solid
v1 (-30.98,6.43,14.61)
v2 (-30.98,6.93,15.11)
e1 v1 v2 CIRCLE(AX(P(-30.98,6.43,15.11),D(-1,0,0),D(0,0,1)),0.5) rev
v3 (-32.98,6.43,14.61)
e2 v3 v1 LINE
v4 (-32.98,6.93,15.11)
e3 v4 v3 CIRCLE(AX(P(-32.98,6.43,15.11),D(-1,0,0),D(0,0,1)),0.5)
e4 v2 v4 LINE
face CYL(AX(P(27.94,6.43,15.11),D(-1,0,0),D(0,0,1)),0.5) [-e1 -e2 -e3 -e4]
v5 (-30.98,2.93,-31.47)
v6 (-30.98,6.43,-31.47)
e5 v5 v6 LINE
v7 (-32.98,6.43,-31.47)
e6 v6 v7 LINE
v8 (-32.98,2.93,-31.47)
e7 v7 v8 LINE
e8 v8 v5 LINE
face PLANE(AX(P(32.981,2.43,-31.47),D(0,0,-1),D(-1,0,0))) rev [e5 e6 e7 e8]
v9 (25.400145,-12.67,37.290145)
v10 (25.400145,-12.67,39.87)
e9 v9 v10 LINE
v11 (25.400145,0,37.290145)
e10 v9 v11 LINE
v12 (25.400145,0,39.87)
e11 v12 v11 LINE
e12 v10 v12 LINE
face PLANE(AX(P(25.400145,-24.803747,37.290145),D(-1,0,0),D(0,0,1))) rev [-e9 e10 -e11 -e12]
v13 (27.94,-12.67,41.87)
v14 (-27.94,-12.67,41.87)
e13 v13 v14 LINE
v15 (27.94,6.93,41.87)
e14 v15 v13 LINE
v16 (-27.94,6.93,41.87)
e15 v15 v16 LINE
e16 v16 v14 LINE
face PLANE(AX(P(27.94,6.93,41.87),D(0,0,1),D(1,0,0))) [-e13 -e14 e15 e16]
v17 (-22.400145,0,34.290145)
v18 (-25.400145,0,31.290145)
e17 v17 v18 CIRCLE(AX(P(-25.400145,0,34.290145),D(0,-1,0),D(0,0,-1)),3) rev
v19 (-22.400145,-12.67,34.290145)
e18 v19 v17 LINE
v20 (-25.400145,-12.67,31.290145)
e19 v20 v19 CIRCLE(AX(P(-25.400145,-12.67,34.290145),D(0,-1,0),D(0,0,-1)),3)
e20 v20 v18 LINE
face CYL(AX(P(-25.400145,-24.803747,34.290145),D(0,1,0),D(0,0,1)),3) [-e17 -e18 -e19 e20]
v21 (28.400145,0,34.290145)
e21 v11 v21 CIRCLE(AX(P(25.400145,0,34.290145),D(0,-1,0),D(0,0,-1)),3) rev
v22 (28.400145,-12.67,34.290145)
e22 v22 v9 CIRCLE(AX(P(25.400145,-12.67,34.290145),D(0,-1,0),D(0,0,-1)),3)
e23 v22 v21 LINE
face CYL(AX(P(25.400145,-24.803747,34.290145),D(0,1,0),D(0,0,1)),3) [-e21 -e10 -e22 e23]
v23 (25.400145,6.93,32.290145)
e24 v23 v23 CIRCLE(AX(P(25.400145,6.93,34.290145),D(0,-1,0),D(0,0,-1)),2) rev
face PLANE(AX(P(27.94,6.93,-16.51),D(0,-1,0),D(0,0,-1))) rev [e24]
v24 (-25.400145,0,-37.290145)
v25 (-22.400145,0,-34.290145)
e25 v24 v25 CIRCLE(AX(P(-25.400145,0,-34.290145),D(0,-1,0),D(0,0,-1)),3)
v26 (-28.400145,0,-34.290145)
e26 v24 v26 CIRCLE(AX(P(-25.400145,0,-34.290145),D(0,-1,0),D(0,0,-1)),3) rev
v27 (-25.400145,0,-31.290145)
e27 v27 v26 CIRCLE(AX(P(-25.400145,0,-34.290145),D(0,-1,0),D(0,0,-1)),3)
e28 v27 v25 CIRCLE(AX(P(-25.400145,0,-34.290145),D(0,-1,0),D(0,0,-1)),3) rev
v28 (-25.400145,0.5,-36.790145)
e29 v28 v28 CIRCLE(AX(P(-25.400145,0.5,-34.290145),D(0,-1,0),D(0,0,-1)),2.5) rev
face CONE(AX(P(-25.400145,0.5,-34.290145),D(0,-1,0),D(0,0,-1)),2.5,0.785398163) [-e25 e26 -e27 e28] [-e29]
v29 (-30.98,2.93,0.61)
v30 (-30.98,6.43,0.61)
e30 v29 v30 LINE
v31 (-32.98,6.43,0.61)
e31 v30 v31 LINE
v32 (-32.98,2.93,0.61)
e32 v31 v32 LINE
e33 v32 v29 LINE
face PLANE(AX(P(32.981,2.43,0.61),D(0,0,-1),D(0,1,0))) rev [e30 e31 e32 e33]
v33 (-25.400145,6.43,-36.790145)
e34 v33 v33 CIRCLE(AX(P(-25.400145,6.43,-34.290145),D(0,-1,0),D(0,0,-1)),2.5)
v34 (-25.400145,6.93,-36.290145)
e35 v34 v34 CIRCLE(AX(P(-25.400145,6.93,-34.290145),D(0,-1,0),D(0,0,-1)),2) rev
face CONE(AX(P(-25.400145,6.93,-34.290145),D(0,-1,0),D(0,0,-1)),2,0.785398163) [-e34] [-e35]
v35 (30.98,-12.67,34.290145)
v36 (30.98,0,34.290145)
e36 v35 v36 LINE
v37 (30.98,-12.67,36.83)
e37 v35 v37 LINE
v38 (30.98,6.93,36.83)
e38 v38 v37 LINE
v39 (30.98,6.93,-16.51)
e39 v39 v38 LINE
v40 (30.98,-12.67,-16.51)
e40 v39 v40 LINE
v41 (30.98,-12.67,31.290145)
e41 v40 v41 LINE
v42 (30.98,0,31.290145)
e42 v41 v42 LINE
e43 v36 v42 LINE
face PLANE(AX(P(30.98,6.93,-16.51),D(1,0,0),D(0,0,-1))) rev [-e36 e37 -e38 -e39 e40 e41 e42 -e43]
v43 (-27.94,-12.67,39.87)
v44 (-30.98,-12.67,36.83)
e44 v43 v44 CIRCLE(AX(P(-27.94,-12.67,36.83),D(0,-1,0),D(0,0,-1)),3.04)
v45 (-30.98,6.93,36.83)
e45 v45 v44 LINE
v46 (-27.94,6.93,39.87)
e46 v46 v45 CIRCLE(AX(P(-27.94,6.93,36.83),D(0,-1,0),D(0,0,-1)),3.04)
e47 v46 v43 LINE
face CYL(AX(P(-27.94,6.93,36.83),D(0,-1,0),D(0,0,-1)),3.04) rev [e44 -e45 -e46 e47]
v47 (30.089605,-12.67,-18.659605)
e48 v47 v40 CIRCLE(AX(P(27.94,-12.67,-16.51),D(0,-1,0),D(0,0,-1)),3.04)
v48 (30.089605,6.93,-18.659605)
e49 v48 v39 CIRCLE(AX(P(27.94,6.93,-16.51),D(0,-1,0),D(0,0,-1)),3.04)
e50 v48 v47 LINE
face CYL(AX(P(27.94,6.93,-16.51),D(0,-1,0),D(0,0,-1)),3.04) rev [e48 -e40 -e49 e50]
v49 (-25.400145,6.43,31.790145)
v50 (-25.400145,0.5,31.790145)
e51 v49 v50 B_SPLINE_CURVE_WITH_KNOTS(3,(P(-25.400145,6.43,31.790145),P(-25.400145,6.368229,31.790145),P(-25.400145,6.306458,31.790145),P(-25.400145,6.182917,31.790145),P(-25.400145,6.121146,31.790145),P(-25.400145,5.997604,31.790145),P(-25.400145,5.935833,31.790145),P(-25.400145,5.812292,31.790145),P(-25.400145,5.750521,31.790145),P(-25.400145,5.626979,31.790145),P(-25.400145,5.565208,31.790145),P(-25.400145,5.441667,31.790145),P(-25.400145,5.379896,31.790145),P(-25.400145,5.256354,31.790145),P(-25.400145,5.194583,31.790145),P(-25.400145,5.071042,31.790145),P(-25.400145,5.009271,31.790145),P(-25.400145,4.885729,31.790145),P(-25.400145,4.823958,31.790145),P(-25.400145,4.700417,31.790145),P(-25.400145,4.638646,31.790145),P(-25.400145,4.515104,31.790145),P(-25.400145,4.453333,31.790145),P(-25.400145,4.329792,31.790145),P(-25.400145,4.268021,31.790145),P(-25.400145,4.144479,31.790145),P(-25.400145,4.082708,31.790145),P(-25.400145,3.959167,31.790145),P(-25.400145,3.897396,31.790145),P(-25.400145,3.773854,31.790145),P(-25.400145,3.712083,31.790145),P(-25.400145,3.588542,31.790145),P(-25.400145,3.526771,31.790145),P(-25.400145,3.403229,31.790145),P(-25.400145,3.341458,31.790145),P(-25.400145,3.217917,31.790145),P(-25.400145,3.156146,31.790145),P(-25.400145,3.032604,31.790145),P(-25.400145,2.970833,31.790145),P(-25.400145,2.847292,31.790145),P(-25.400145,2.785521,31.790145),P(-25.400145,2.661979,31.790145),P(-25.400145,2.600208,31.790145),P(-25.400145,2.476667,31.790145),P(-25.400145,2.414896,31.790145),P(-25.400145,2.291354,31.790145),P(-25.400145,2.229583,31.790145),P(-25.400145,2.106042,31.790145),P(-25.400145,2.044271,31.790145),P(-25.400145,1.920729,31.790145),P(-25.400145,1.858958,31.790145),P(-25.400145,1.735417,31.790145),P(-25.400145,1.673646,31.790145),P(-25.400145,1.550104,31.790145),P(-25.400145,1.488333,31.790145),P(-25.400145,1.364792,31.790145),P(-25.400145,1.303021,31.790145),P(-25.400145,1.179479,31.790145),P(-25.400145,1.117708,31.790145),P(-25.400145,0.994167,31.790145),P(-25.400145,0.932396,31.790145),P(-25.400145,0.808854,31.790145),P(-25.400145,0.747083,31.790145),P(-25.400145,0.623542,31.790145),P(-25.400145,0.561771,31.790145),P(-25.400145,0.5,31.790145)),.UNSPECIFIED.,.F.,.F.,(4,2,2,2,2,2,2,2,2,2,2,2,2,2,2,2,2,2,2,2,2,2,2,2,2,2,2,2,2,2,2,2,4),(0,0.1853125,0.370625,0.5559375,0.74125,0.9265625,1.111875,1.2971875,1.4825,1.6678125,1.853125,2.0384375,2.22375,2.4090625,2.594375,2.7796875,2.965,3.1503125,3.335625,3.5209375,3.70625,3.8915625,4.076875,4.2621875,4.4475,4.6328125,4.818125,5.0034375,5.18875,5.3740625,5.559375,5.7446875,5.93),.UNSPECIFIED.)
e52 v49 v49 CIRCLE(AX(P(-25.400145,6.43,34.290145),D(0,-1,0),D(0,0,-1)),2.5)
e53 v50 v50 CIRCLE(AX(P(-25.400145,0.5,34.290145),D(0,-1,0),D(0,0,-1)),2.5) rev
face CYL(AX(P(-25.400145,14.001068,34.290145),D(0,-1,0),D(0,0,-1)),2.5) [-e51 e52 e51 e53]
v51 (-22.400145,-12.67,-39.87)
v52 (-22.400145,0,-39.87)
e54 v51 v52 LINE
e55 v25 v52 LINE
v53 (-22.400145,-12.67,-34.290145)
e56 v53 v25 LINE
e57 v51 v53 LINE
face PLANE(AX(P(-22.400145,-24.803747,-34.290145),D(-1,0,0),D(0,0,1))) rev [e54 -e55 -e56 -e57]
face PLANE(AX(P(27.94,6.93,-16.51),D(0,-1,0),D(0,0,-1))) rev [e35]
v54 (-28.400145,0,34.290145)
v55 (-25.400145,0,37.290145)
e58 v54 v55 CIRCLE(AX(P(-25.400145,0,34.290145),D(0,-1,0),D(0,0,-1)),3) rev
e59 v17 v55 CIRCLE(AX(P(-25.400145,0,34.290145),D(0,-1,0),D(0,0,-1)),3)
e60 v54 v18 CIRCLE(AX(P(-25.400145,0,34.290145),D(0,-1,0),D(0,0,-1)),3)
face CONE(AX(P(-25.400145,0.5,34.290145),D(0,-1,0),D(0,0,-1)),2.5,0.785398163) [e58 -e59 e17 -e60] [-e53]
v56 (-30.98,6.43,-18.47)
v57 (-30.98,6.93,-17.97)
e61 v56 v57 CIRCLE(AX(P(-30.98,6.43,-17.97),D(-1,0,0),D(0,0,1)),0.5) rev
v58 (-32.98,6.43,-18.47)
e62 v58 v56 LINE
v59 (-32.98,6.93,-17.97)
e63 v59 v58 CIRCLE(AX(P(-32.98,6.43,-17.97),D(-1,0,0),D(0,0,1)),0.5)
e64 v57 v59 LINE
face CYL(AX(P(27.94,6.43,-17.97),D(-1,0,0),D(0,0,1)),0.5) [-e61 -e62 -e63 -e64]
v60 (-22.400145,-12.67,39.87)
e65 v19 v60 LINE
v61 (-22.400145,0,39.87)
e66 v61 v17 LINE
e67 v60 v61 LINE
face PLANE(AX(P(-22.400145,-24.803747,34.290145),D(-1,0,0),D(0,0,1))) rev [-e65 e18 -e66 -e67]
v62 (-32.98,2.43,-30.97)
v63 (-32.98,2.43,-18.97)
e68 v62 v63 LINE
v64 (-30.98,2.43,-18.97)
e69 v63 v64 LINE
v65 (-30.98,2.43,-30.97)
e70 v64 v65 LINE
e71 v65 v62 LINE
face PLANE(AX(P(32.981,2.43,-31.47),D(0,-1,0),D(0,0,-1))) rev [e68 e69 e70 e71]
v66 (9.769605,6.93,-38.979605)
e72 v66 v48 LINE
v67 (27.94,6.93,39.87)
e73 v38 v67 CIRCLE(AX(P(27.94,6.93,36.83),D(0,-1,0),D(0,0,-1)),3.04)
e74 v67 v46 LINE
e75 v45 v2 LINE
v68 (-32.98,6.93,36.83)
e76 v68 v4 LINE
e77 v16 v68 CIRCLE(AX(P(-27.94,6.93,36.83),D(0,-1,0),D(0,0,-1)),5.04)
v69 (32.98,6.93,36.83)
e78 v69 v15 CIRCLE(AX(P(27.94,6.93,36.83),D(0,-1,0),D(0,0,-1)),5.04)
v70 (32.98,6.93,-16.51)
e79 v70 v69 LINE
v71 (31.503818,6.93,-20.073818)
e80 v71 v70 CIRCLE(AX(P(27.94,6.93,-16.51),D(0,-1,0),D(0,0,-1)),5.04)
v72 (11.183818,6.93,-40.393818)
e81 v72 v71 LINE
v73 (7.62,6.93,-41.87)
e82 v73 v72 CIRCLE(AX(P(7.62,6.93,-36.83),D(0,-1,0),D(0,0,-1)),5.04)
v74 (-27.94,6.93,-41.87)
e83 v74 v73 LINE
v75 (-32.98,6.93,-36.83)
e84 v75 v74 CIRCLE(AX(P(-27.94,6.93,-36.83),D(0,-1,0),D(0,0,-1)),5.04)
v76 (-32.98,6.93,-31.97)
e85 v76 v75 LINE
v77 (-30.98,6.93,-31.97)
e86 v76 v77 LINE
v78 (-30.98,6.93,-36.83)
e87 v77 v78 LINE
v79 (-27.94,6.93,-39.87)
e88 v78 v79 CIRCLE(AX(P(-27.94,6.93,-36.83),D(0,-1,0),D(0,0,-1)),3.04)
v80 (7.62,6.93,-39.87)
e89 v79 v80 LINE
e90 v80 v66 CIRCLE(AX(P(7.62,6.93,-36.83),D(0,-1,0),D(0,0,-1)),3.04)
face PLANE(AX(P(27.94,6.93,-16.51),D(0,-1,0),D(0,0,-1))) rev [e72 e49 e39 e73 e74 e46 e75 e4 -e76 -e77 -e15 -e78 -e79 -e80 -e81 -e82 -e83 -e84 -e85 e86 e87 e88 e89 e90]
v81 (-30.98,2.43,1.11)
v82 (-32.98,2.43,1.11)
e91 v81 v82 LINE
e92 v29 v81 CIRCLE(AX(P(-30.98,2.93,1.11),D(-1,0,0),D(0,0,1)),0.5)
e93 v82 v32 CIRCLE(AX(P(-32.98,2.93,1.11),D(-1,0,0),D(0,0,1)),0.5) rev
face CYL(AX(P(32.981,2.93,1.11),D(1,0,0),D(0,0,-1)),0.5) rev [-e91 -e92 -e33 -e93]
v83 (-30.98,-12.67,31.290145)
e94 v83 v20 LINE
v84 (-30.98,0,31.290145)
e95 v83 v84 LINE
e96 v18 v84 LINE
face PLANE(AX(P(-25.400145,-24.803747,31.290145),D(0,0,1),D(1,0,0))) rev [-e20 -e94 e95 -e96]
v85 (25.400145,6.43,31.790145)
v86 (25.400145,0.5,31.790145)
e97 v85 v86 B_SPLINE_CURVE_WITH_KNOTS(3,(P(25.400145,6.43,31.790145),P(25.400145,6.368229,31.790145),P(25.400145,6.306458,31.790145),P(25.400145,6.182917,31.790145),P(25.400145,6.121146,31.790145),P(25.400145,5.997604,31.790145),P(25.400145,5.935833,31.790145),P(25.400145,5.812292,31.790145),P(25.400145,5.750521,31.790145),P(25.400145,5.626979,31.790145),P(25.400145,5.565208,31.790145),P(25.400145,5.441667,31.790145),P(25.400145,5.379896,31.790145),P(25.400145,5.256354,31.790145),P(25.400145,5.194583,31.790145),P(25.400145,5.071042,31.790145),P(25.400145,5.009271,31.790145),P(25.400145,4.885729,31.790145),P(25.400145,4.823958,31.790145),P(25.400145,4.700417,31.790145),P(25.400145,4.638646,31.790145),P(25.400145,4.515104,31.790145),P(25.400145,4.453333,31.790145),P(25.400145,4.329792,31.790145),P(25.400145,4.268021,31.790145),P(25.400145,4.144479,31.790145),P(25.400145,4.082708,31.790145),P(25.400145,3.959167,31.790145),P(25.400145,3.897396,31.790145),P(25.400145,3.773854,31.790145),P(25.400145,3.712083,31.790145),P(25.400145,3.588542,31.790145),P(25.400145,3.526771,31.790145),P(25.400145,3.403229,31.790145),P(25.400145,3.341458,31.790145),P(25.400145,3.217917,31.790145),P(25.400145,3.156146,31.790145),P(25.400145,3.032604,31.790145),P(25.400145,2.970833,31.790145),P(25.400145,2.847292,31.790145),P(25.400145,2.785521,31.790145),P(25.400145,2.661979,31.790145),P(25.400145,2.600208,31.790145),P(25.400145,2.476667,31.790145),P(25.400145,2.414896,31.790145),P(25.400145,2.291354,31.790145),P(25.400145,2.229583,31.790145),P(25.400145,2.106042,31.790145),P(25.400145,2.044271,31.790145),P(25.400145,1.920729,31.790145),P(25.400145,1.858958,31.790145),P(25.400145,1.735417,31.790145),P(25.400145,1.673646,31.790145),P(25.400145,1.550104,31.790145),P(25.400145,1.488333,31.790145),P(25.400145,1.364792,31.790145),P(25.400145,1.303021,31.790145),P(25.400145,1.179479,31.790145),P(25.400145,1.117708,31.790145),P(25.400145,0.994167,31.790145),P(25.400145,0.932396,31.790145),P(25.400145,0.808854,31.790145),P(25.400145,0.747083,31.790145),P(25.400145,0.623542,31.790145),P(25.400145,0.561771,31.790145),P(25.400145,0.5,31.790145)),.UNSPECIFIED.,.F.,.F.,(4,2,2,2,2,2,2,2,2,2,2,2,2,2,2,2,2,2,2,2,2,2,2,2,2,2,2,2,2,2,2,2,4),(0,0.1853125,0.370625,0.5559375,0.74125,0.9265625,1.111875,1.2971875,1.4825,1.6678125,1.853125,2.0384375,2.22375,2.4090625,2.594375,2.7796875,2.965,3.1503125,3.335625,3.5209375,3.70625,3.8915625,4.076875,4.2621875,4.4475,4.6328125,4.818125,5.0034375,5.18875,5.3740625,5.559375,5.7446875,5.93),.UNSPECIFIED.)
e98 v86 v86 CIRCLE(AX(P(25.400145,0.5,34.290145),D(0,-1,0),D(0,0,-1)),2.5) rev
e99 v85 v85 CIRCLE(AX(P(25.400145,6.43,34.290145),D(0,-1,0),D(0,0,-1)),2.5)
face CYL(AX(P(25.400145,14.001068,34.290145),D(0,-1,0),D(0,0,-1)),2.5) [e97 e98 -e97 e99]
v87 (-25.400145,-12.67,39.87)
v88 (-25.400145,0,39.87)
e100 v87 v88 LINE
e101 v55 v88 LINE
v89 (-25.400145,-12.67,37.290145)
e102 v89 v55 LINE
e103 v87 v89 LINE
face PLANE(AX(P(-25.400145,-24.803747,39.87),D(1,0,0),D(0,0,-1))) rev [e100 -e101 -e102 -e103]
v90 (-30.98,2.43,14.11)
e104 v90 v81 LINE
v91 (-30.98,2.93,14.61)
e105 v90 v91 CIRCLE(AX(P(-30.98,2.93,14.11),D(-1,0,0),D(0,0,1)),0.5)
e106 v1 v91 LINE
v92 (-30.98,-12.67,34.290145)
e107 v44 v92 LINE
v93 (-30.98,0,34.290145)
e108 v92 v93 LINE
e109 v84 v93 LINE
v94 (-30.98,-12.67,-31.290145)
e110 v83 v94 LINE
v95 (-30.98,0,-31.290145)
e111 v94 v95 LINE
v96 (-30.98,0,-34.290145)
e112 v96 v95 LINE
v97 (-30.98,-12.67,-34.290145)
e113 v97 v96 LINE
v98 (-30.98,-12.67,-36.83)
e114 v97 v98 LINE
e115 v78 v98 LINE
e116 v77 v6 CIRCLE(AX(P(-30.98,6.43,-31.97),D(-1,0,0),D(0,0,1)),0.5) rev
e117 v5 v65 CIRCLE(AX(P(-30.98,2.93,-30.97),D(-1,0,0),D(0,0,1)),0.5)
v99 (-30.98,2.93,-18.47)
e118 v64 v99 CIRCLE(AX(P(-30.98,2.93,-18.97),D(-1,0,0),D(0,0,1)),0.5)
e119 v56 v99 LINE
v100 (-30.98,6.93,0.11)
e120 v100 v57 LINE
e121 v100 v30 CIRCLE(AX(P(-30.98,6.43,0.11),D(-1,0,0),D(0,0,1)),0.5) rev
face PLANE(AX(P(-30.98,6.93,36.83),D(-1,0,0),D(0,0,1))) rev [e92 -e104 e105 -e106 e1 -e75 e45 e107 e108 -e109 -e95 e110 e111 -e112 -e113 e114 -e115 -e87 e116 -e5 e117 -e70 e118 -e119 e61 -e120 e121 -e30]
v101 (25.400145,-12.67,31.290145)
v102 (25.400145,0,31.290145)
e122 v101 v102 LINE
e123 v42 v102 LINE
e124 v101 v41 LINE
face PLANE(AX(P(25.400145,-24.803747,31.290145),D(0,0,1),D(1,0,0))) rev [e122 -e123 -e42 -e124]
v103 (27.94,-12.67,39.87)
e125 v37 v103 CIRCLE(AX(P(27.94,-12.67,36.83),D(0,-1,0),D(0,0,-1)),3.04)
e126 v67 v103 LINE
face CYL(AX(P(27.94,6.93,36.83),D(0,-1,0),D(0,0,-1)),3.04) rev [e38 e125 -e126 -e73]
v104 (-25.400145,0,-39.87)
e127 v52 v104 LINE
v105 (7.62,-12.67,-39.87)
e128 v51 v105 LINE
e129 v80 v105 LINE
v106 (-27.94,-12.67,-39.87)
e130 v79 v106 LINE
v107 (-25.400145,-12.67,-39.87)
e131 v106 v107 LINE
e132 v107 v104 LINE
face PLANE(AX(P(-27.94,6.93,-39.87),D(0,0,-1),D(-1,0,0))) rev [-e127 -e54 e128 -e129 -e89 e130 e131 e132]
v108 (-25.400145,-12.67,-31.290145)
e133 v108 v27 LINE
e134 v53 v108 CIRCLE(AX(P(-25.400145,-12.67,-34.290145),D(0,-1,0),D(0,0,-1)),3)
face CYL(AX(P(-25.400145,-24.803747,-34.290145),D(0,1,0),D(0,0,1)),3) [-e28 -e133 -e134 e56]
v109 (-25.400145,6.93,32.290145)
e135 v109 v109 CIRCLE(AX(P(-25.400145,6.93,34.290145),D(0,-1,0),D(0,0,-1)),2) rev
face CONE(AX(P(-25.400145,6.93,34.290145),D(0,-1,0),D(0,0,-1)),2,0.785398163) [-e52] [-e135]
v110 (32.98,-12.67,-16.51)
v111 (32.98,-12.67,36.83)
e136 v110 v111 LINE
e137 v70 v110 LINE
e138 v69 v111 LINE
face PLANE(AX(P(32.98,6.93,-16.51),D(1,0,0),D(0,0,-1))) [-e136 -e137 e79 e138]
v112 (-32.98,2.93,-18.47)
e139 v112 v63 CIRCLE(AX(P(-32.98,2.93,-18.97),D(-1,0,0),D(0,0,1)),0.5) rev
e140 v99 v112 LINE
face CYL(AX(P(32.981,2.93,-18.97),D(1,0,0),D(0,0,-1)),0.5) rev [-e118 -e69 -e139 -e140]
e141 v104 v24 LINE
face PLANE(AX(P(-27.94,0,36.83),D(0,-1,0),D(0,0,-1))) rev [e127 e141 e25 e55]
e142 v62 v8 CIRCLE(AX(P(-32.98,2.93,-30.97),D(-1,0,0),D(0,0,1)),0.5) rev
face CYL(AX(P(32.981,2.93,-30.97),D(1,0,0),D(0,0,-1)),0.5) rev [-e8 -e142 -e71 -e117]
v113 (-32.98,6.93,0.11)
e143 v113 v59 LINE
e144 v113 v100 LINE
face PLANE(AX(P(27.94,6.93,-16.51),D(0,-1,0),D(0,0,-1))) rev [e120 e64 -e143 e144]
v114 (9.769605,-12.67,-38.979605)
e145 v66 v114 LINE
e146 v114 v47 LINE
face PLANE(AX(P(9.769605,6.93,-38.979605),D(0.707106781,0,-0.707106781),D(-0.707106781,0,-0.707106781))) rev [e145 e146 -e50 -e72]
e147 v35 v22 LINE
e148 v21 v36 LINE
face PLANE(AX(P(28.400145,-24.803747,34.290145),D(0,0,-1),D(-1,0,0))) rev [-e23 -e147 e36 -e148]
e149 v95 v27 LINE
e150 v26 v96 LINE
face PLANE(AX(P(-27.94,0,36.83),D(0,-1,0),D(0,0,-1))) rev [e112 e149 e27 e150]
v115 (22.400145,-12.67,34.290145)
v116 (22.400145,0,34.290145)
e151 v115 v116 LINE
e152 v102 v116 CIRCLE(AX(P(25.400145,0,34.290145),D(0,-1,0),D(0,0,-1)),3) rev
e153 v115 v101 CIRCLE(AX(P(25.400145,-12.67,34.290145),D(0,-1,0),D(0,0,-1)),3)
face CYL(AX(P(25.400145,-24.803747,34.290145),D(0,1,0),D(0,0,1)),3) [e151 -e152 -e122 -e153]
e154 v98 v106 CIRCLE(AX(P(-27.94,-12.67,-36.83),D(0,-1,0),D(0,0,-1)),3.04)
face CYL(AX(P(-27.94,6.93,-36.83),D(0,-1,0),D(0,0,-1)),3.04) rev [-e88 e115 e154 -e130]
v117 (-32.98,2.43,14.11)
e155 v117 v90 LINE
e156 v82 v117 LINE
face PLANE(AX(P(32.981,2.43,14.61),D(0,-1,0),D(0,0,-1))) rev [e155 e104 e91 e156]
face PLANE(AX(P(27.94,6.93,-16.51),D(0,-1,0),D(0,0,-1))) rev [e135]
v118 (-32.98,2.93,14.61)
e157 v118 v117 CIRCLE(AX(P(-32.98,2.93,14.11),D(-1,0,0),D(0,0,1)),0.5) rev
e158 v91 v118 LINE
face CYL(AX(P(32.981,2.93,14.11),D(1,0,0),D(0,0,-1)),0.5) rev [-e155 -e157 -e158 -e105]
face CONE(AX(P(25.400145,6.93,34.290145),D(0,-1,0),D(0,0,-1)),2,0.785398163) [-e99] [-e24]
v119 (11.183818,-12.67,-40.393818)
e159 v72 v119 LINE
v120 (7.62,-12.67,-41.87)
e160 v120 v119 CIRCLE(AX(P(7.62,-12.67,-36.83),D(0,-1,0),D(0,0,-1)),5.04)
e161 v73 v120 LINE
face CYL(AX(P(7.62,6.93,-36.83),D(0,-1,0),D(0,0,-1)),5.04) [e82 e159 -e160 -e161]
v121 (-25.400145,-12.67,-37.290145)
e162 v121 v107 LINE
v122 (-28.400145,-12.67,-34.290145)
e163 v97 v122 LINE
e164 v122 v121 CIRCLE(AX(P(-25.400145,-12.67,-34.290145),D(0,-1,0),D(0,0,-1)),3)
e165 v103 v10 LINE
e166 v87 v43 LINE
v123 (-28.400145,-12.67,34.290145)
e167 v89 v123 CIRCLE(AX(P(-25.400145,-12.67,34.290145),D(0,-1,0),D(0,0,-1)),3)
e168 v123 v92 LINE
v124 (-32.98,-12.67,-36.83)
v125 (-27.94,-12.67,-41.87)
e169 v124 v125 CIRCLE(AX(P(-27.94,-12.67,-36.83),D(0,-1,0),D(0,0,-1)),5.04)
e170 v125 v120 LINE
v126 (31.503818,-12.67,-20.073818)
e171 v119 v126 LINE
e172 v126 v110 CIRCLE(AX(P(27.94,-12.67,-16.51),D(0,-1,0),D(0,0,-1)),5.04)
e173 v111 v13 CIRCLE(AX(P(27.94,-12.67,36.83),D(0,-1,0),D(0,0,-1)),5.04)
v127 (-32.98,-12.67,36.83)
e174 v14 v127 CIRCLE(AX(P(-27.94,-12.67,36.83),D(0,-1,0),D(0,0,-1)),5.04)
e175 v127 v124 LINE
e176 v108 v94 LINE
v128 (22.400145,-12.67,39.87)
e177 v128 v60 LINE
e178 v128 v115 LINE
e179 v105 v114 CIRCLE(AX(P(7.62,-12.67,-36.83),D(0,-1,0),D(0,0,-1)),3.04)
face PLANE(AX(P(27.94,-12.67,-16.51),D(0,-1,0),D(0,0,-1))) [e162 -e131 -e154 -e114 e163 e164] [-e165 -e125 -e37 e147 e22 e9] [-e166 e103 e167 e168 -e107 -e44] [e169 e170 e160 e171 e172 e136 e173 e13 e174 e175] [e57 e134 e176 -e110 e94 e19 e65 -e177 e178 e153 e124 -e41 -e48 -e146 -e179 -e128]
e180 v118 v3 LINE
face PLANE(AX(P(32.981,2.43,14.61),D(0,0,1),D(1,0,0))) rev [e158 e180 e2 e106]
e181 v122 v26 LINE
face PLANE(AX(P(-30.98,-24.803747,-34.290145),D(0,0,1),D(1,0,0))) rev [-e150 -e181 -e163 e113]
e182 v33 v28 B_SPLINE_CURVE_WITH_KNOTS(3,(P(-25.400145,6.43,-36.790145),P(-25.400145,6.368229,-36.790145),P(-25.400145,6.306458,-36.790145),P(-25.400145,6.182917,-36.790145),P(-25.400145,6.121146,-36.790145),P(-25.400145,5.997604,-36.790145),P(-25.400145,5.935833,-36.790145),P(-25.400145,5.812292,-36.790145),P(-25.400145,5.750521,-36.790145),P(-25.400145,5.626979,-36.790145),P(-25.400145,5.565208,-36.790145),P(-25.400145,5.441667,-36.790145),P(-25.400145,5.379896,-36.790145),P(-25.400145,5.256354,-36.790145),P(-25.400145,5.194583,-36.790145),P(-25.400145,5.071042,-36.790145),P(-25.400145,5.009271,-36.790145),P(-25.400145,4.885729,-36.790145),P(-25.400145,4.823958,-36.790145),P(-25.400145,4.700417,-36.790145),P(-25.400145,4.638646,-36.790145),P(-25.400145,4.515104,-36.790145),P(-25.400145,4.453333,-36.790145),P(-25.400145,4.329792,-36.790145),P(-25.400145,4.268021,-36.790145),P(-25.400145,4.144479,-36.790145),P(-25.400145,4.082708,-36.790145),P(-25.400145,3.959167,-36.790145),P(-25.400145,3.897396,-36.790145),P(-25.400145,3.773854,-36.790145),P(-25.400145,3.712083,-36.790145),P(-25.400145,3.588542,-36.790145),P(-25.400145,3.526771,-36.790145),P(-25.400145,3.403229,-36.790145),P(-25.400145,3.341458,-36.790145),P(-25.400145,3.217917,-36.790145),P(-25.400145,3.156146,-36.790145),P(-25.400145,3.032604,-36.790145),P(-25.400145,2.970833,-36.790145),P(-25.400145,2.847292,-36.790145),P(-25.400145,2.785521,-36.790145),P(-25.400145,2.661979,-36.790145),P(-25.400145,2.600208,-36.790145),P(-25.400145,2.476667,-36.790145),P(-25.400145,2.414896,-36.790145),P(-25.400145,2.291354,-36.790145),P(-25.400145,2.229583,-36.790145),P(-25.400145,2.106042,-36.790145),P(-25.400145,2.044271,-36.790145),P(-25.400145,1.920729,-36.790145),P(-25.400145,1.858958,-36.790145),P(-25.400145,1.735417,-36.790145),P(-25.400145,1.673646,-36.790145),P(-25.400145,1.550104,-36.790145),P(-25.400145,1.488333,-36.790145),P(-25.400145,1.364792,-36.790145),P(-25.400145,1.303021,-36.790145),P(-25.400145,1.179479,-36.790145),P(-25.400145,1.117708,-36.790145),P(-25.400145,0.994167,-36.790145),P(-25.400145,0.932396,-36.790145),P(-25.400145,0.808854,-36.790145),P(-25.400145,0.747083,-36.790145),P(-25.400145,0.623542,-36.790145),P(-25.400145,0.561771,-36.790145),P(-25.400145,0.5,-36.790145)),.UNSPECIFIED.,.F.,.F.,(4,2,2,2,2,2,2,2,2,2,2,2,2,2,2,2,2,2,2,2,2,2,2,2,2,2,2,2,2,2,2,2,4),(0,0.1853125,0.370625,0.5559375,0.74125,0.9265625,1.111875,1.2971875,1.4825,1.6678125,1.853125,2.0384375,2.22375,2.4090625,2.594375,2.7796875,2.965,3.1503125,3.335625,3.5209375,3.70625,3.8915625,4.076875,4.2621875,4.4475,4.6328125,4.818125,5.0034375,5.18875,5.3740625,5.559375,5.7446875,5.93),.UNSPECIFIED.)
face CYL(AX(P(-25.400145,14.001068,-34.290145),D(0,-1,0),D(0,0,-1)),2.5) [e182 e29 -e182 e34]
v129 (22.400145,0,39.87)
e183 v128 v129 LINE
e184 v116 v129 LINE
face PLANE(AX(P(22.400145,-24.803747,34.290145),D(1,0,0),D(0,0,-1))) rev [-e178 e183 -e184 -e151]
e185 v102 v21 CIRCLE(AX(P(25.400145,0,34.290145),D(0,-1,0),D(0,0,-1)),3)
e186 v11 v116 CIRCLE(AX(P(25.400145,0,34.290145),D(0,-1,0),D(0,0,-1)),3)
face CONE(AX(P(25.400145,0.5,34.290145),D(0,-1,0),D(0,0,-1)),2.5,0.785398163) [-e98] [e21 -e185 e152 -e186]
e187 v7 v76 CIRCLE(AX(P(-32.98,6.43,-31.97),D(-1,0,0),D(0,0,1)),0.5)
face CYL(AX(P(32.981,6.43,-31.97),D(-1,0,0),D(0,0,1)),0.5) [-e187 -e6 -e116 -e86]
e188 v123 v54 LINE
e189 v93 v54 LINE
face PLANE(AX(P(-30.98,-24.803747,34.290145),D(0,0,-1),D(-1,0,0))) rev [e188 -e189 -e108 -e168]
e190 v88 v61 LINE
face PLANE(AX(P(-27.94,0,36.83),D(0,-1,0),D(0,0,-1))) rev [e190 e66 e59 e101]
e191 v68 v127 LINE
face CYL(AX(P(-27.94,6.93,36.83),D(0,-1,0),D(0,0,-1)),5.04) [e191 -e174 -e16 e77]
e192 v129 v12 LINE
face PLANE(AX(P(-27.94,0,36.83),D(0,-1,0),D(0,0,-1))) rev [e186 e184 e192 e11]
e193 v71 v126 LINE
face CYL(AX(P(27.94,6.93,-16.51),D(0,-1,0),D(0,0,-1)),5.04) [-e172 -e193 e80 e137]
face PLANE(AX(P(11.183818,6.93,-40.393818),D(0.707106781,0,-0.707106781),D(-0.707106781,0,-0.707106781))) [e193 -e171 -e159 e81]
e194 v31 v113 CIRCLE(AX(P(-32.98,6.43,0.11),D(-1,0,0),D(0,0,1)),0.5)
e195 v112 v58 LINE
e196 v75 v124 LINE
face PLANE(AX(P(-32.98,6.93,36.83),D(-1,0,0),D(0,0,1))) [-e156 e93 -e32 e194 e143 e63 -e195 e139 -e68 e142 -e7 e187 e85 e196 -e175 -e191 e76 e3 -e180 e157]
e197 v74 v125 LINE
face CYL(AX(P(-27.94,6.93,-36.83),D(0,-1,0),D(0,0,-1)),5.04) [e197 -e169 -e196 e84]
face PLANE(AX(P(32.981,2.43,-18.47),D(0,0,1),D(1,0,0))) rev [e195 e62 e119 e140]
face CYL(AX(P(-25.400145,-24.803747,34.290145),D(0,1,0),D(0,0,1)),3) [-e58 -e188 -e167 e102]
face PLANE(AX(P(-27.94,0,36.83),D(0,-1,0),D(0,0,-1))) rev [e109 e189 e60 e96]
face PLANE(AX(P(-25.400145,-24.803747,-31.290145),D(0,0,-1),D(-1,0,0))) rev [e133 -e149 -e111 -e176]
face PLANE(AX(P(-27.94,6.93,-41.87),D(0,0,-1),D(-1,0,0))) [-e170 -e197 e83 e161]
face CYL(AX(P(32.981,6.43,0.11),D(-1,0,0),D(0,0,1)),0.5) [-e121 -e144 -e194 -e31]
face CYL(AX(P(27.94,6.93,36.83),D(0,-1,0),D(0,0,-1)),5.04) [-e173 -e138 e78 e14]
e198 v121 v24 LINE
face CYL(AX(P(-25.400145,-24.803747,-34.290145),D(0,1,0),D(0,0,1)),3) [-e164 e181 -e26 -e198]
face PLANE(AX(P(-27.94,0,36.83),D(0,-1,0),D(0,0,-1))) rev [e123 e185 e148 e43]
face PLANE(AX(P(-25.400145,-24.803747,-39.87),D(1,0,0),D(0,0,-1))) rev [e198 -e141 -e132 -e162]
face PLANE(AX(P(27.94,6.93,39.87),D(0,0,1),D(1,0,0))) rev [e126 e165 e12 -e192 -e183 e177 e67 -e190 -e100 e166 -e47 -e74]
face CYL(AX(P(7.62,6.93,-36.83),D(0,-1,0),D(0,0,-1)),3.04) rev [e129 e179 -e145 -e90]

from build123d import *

# Parameters (mm, degrees)
WALLS_DEPTH               = 1.6
WALLS_DEPTH_BACK          = 18
PORTS_REACH               = 81.148
PORT_SKETCH_W             = 14
PORT_SKETCH_H             = 4.5
PORT_SKETCH_W_2           = 13
PORT_FILLET_R             = 0.5
MOUNTING_BASE_START       = -11.07
MOUNTING_BASE_SKETCH_R    = 2.5
MOUNTING_BASE_DEPTH       = 12.67
MOUNTING_PINS_START       = -18
MOUNTING_BASE_SKETCH_2_R  = 2.5
MOUNTING_PINS_DEPTH       = 19.6
MOUNTING_PIN_CHAMFER_SIZE = 0.5


with BuildPart() as part:
    # Base_Sketch → Walls (new, two sides: drawn at the far end of the back side and taken through both)
    with BuildSketch(Plane(origin=(0, -11.07, 0), x_dir=(-1, 0, 0), z_dir=(0, -1, 0)).offset(-WALLS_DEPTH_BACK)):
        with BuildLine():
            Line((-32.98, 16.51), (-32.98, -36.83))
            ThreePointArc((-32.98, -36.83), (-31.503818177, -40.393818177), (-27.94, -41.87))
            Line((-27.94, -41.87), (27.94, -41.87))
            ThreePointArc((27.94, -41.87), (31.503818177, -40.393818177), (32.98, -36.83))
            Line((32.98, -36.83), (32.98, 36.83))
            ThreePointArc((32.98, 36.83), (31.503818177, 40.393818177), (27.94, 41.87))
            Line((27.94, 41.87), (-7.62, 41.87))
            ThreePointArc((-7.62, 41.87), (-9.548724499, 41.486352844), (-11.183818177, 40.393818177))
            Line((-11.183818177, 40.393818177), (-31.503818177, 20.073818177))
            ThreePointArc((-31.503818177, 20.073818177), (-32.596352844, 18.438724499), (-32.98, 16.51))
        make_face()
        with BuildLine():
            Line((-30.98, 16.51), (-30.98, -36.83))
            ThreePointArc((-30.98, -36.83), (-30.089604615, -38.979604615), (-27.94, -39.87))
            Line((-27.94, -39.87), (27.94, -39.87))
            ThreePointArc((27.94, -39.87), (30.089604615, -38.979604615), (30.98, -36.83))
            Line((30.98, -36.83), (30.98, 36.83))
            ThreePointArc((30.98, 36.83), (30.089604615, 38.979604615), (27.94, 39.87))
            Line((27.94, 39.87), (-7.62, 39.87))
            ThreePointArc((-7.62, 39.87), (-8.783357634, 39.638593779), (-9.769604615, 38.979604615))
            Line((-9.769604615, 38.979604615), (-30.089604615, 18.659604615))
            ThreePointArc((-30.089604615, 18.659604615), (-30.748593779, 17.673357634), (-30.98, 16.51))
        make_face(mode=Mode.SUBTRACT)
    extrude(amount=WALLS_DEPTH + WALLS_DEPTH_BACK)

    # Port_Sketch → Ports (cut, up to next)
    with BuildSketch(Plane.ZY.offset(32.98), mode=Mode.PRIVATE) as ports_sk1:
        with Locations((7.61, 4.68)):
            Rectangle(PORT_SKETCH_W, PORT_SKETCH_H)
    ports_tool1 = extrude(ports_sk1.sketch, amount=-PORTS_REACH, mode=Mode.PRIVATE) & part.part
    # Port_Sketch → Ports (cut, up to next)
    with BuildSketch(Plane.ZY.offset(32.98), mode=Mode.PRIVATE) as ports_sk2:
        with Locations((-24.97, 4.68)):
            Rectangle(PORT_SKETCH_W_2, PORT_SKETCH_H)
    ports_tool2 = extrude(ports_sk2.sketch, amount=-PORTS_REACH, mode=Mode.PRIVATE) & part.part
    add(ports_tool1.solids().sort_by_distance((-32.98, 4.68, 7.61))[0], mode=Mode.SUBTRACT)
    add(ports_tool2.solids().sort_by_distance((-32.98, 4.68, -24.97))[0], mode=Mode.SUBTRACT)

    # Port_Fillet
    port_fillet_edges = [part.edges().sort_by_distance(p)[0] for p in [
        (-31.98, 6.93, -18.47),
        (-31.98, 6.93, -31.47),
        (-31.98, 2.43, -31.47),
        (-31.98, 2.43, -18.47),
        (-31.98, 2.43, 0.61),
        (-31.98, 6.93, 0.61),
        (-31.98, 6.93, 14.61),
        (-31.98, 2.43, 14.61),
    ]]
    fillet(port_fillet_edges, radius=PORT_FILLET_R)

    # Mounting_Base_Sketch → Mounting_Base (add)
    # profile 1 of 3: a face of its own
    with BuildSketch(Plane(origin=(0, -11.07, 0), x_dir=(-1, 0, 0), z_dir=(0, -1, 0)).offset(MOUNTING_BASE_START)):
        with BuildLine():
            Line((22.400144884, -34.290144884), (22.400144884, -39.87))
            Line((22.400144884, -39.87), (25.400144884, -39.87))
            Line((25.400144884, -39.87), (25.400144884, -37.290144884))
            ThreePointArc((25.400144884, -37.290144884), (27.521465228, -36.411465228), (28.400144884, -34.290144884))
            Line((28.400144884, -34.290144884), (30.98, -34.290144884))
            Line((30.98, -34.290144884), (30.98, -31.290144884))
            Line((30.98, -31.290144884), (25.400144884, -31.290144884))
            ThreePointArc((25.400144884, -31.290144884), (23.27882454, -32.16882454), (22.400144884, -34.290144884))
        make_face()
        with Locations(Location((25.400144884, -34.290144884, 0), (0, 0, 270))):
            Circle(MOUNTING_BASE_SKETCH_R, mode=Mode.SUBTRACT)
    # profile 2 of 3: a face of its own
    with BuildSketch(Plane(origin=(0, -11.07, 0), x_dir=(-1, 0, 0), z_dir=(0, -1, 0)).offset(MOUNTING_BASE_START)):
        with BuildLine():
            Line((-25.400144884, -31.290144884), (-30.98, -31.290144884))
            Line((-30.98, -31.290144884), (-30.98, -34.290144884))
            Line((-30.98, -34.290144884), (-28.400144884, -34.290144884))
            ThreePointArc((-28.400144884, -34.290144884), (-27.521465228, -36.411465228), (-25.400144884, -37.290144884))
            Line((-25.400144884, -37.290144884), (-25.400144884, -39.87))
            Line((-25.400144884, -39.87), (-22.400144884, -39.87))
            Line((-22.400144884, -39.87), (-22.400144884, -34.290144884))
            ThreePointArc((-22.400144884, -34.290144884), (-23.27882454, -32.16882454), (-25.400144884, -31.290144884))
        make_face()
        with Locations(Location((-25.400144884, -34.290144884, 0), (0, 0, 270))):
            Circle(MOUNTING_BASE_SKETCH_R, mode=Mode.SUBTRACT)
    # profile 3 of 3: a face of its own
    with BuildSketch(Plane(origin=(0, -11.07, 0), x_dir=(-1, 0, 0), z_dir=(0, -1, 0)).offset(MOUNTING_BASE_START)):
        with BuildLine():
            Line((22.400144884, 34.290144884), (22.400144884, 39.87))
            Line((22.400144884, 39.87), (25.400144884, 39.87))
            Line((25.400144884, 39.87), (25.400144884, 37.290144884))
            ThreePointArc((25.400144884, 37.290144884), (27.521465228, 36.411465228), (28.400144884, 34.290144884))
            Line((28.400144884, 34.290144884), (30.98, 34.290144884))
            Line((30.98, 34.290144884), (30.98, 31.290144884))
            Line((30.98, 31.290144884), (25.400144884, 31.290144884))
            ThreePointArc((25.400144884, 31.290144884), (23.27882454, 32.16882454), (22.400144884, 34.290144884))
        make_face()
        with Locations(Location((25.400144884, 34.290144884, 0), (0, 0, 270))):
            Circle(MOUNTING_BASE_SKETCH_R, mode=Mode.SUBTRACT)
    extrude(amount=MOUNTING_BASE_DEPTH)

    # Mounting_Base_Sketch<2> → Mounting_Pins (add)
    with BuildSketch(Plane(origin=(0, -11.07, 0), x_dir=(-1, 0, 0), z_dir=(0, -1, 0)).offset(MOUNTING_PINS_START)):
        with Locations(Location((-25.400144884, -34.290144884, 0), (0, 0, 90))):
            Circle(MOUNTING_BASE_SKETCH_2_R)
        with Locations(Location((25.400144884, -34.290144884, 0), (0, 0, 90))):
            Circle(MOUNTING_BASE_SKETCH_2_R)
        with Locations(Location((25.400144884, 34.290144884, 0), (0, 0, 90))):
            Circle(MOUNTING_BASE_SKETCH_2_R)
    extrude(amount=MOUNTING_PINS_DEPTH)

    # Mounting_Pin_Chamfer
    mounting_pin_chamfer_edges = [part.edges().sort_by_distance(p)[0] for p in [
        (25.400144884, 0, 36.790144884),
        (-25.400144884, 0, 36.790144884),
        (-25.400144884, 0, -31.790144884),
        (25.400144884, 6.93, 36.790144884),
        (-25.400144884, 6.93, 36.790144884),
        (-25.400144884, 6.93, -31.790144884),
    ]]
    chamfer(mounting_pin_chamfer_edges, length=MOUNTING_PIN_CHAMFER_SIZE - 0.0001)  # a hair under: the kernel refuses the full size


solid = part.part
